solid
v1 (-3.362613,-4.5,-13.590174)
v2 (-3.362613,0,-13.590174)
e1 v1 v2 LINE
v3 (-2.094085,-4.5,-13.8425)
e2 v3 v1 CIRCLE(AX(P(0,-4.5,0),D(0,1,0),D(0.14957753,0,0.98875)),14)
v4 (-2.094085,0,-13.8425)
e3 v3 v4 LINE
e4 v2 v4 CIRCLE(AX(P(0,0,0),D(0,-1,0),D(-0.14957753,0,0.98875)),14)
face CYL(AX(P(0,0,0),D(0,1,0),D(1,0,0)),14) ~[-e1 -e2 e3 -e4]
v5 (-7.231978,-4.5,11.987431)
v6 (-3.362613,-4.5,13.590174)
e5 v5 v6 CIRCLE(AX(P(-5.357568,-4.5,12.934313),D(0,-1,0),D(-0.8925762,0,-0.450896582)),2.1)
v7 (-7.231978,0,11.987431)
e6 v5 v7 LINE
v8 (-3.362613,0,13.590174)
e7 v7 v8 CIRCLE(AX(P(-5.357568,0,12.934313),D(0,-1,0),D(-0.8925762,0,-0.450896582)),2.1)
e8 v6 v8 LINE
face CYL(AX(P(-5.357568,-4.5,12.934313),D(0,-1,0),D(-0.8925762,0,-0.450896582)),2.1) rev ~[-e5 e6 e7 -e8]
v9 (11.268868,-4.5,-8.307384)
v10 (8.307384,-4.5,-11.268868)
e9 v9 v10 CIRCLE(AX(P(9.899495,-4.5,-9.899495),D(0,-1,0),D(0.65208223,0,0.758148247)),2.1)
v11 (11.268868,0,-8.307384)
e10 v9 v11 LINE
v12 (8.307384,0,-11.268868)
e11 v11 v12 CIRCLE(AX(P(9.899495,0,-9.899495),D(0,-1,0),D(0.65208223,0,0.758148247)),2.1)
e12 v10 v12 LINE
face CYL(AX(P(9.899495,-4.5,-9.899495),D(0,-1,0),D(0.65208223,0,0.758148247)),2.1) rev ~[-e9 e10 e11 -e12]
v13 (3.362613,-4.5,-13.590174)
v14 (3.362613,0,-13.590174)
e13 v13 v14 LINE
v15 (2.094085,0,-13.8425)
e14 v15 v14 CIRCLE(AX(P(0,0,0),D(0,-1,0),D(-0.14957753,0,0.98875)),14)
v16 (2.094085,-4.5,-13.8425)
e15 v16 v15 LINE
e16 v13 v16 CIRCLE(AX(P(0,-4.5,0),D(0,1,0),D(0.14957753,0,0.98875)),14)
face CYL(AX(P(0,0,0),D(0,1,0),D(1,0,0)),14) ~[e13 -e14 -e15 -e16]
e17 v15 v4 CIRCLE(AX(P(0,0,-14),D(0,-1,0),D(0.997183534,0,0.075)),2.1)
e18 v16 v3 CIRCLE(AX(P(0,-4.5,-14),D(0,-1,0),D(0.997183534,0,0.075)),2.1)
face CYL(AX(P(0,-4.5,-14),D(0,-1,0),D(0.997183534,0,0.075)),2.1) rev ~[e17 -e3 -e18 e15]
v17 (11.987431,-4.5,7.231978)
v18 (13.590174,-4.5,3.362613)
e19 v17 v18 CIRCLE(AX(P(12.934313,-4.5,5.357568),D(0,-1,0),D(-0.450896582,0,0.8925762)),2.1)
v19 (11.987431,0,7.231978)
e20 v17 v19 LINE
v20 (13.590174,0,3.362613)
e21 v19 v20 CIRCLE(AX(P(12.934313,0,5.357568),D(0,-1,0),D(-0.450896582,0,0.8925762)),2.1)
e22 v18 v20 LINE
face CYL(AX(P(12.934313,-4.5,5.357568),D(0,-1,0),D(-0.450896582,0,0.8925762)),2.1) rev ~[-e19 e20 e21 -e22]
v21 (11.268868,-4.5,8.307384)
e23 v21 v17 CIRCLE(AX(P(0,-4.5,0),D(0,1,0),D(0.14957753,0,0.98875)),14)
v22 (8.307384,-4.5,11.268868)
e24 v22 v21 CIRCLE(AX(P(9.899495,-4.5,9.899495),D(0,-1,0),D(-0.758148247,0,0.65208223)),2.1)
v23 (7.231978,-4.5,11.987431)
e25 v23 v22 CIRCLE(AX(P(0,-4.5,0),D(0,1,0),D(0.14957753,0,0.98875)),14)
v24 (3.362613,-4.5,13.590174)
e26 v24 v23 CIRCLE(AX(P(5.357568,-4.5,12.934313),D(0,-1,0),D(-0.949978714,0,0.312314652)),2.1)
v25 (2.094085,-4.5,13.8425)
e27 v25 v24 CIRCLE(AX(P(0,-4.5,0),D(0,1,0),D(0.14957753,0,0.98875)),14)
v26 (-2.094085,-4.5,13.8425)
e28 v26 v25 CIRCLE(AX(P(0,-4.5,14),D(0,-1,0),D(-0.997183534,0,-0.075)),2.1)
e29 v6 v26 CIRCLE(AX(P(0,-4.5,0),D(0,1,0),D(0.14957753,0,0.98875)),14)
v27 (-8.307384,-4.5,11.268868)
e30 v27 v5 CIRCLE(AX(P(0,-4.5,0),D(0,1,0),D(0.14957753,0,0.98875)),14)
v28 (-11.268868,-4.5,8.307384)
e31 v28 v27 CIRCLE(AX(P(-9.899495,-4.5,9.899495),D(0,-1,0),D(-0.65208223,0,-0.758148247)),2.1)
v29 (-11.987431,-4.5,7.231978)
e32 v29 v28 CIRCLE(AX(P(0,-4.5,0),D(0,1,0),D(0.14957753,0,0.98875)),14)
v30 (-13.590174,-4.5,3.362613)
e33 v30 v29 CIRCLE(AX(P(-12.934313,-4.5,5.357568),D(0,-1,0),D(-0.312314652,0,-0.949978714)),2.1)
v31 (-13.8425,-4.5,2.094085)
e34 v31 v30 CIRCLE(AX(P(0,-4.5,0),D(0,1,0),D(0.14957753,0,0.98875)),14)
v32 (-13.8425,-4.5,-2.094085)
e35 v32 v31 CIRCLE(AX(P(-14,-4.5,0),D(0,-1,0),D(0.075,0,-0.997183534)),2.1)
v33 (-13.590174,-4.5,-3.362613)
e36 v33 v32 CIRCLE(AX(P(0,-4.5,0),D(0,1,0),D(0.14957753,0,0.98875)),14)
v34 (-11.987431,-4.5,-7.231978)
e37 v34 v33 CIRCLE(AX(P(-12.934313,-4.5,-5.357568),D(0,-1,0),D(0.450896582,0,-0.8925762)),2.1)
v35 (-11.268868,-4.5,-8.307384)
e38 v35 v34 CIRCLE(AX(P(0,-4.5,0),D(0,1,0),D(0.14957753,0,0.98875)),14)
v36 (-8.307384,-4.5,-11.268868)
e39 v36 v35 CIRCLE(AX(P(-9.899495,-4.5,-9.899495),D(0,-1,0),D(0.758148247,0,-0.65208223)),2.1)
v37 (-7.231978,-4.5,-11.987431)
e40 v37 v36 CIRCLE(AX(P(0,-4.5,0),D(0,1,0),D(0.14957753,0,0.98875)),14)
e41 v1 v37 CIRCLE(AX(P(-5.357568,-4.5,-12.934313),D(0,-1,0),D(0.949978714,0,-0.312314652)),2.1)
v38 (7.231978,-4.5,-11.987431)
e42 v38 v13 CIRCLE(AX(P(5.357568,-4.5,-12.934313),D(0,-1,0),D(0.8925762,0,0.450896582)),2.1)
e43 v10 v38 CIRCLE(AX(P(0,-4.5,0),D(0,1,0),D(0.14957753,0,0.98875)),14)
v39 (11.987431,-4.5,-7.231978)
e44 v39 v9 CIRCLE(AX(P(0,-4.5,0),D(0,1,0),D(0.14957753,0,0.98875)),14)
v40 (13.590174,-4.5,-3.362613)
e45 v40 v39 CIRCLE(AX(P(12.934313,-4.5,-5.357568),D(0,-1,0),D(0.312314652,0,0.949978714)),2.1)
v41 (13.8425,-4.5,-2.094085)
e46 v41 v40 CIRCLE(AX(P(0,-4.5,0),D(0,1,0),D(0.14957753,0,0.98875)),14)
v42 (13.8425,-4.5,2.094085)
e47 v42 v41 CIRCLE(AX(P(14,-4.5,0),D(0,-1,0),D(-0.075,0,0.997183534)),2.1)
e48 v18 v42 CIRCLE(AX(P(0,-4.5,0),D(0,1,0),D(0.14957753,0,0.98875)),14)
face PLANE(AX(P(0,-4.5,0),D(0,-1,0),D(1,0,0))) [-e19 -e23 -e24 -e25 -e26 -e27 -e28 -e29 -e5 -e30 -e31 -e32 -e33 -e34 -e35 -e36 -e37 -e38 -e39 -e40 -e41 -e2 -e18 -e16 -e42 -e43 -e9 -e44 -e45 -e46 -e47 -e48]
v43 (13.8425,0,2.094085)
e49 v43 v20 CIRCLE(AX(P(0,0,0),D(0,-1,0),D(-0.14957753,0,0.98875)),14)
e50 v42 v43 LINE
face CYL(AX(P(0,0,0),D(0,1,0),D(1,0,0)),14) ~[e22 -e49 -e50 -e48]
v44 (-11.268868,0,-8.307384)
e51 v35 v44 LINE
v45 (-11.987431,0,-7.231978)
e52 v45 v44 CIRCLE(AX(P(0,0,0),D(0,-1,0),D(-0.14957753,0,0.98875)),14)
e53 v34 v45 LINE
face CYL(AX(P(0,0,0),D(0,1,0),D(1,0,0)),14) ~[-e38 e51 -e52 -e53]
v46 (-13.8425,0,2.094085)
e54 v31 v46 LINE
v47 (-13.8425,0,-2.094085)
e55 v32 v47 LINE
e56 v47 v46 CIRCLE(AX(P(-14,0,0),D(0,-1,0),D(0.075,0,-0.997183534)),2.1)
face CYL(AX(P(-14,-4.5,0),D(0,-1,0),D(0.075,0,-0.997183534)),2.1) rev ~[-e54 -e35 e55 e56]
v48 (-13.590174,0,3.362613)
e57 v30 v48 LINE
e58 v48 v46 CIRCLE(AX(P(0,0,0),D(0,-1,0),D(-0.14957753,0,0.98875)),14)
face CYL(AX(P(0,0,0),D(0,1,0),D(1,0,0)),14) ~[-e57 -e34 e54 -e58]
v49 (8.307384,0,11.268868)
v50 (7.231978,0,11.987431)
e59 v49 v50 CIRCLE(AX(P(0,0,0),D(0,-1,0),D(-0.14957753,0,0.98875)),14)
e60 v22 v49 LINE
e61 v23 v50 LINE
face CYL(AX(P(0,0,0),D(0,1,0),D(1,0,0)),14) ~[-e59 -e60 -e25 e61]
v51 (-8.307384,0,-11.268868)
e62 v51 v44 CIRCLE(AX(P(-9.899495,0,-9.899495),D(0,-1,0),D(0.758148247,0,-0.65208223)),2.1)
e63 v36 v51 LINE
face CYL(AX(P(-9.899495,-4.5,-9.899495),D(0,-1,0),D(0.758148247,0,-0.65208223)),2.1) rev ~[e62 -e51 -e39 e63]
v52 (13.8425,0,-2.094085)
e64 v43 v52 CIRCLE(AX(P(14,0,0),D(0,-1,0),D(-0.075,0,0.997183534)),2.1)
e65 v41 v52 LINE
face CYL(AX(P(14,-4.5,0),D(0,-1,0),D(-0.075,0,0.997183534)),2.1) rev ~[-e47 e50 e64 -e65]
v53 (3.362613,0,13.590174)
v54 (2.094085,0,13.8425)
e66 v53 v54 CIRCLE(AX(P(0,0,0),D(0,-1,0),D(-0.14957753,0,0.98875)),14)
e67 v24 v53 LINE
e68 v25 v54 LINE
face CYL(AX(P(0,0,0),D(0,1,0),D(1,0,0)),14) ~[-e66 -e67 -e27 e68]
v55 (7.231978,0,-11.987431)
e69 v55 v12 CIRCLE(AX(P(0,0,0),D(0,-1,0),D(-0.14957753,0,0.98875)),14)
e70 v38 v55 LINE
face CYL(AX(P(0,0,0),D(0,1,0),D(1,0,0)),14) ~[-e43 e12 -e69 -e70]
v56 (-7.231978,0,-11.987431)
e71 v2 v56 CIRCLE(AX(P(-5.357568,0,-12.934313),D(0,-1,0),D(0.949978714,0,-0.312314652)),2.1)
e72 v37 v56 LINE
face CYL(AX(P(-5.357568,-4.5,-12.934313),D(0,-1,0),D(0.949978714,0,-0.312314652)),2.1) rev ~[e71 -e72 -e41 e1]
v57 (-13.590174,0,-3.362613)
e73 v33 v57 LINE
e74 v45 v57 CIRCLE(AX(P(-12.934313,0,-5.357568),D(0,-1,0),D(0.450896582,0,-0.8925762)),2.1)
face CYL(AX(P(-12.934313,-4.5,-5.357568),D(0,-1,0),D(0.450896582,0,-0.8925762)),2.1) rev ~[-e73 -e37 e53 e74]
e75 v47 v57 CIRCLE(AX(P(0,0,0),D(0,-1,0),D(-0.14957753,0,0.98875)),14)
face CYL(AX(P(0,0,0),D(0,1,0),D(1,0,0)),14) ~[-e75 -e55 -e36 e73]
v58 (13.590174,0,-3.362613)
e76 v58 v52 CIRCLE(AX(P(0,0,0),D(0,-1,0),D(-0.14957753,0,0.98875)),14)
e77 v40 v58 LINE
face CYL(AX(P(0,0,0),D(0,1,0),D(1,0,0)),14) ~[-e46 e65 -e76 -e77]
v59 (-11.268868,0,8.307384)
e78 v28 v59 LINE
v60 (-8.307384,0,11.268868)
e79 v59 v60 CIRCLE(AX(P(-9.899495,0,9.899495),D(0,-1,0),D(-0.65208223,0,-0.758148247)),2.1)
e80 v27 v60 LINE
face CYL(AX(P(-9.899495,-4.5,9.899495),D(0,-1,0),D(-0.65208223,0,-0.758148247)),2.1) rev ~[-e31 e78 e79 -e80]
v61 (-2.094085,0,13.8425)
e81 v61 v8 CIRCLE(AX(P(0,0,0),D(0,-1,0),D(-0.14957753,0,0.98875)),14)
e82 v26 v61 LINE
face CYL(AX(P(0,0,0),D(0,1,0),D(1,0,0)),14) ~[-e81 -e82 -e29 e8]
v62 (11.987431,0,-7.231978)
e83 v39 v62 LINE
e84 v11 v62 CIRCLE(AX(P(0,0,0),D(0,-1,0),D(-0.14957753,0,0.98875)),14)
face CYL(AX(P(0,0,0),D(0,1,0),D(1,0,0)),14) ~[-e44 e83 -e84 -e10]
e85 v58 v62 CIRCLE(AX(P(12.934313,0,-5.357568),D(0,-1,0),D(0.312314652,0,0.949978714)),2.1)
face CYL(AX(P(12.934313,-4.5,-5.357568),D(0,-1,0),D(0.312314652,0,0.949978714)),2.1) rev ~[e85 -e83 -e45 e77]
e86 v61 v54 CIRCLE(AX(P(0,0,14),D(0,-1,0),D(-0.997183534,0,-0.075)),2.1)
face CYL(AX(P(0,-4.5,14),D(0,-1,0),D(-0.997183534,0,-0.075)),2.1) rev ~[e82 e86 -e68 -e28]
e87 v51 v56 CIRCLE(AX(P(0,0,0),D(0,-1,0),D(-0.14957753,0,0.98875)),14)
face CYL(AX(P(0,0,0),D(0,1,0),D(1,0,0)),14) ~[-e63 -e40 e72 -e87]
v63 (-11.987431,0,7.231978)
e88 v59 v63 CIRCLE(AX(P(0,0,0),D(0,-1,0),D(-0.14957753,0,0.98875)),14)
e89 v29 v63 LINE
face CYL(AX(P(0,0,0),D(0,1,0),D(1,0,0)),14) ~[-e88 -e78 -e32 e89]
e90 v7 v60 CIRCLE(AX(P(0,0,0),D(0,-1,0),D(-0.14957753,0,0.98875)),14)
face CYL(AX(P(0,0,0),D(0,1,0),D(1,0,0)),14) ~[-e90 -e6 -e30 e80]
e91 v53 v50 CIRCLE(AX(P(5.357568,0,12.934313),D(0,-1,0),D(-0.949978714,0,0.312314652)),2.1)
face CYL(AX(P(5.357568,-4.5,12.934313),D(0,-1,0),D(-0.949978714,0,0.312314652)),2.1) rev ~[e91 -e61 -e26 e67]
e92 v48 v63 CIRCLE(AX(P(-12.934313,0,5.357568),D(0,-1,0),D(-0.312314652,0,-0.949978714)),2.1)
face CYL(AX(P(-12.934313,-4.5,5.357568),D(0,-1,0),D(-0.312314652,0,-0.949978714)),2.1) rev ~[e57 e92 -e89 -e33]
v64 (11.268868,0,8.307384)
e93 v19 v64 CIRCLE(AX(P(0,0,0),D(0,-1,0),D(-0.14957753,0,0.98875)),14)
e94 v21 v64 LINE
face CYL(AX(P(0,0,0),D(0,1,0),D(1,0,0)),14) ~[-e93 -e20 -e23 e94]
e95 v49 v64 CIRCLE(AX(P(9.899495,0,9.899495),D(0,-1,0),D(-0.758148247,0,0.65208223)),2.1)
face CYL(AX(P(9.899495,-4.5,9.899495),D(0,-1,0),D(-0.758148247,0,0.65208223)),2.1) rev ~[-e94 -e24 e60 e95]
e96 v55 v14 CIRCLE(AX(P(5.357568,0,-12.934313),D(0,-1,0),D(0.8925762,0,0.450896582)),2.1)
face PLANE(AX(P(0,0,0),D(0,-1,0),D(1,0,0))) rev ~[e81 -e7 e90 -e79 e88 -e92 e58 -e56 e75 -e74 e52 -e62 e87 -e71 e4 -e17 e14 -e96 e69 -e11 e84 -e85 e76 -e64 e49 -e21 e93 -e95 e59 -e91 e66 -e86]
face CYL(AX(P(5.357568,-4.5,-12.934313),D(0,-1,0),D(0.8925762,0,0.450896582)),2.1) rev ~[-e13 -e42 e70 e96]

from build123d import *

# Parameters (mm, degrees)
F0_R            = 14
F1_DEPTH        = 4.5
F3_DEPTH        = 4.501
F3_COPIES_COUNT = 16


# Not quite as in the source:
# - a pattern or mirror of a feature is missing from the dataset's text; its kind, count and spacing are read off the source's solid


with BuildPart() as f1:
    # F0 (on Front) → F1 (new body)
    with BuildSketch(Plane.XZ):
        Circle(F0_R)
    extrude(amount=F1_DEPTH)

    # F2 (on face) → F3 (cut, through all)
    with BuildSketch(Plane.XZ.offset(4.5)):
        with BuildLine():
            ThreePointArc((2.0940854209, 13.8425), (0, 14), (-2.0940854209, 13.8425))
            ThreePointArc((-2.0940854209, 13.8425), (0, 11.9), (2.0940854209, 13.8425))
        make_face()
    f3 = extrude(amount=-F3_DEPTH, mode=Mode.SUBTRACT)

    # F3_copies: F3 ×16 about axis
    f3_copies_axis = Axis((0, 0, 0), (0, 1, 0))
    for i in range(1, F3_COPIES_COUNT):
        add(f3.rotate(f3_copies_axis, i * 360 / F3_COPIES_COUNT), mode=Mode.SUBTRACT)


solid = f1.part
